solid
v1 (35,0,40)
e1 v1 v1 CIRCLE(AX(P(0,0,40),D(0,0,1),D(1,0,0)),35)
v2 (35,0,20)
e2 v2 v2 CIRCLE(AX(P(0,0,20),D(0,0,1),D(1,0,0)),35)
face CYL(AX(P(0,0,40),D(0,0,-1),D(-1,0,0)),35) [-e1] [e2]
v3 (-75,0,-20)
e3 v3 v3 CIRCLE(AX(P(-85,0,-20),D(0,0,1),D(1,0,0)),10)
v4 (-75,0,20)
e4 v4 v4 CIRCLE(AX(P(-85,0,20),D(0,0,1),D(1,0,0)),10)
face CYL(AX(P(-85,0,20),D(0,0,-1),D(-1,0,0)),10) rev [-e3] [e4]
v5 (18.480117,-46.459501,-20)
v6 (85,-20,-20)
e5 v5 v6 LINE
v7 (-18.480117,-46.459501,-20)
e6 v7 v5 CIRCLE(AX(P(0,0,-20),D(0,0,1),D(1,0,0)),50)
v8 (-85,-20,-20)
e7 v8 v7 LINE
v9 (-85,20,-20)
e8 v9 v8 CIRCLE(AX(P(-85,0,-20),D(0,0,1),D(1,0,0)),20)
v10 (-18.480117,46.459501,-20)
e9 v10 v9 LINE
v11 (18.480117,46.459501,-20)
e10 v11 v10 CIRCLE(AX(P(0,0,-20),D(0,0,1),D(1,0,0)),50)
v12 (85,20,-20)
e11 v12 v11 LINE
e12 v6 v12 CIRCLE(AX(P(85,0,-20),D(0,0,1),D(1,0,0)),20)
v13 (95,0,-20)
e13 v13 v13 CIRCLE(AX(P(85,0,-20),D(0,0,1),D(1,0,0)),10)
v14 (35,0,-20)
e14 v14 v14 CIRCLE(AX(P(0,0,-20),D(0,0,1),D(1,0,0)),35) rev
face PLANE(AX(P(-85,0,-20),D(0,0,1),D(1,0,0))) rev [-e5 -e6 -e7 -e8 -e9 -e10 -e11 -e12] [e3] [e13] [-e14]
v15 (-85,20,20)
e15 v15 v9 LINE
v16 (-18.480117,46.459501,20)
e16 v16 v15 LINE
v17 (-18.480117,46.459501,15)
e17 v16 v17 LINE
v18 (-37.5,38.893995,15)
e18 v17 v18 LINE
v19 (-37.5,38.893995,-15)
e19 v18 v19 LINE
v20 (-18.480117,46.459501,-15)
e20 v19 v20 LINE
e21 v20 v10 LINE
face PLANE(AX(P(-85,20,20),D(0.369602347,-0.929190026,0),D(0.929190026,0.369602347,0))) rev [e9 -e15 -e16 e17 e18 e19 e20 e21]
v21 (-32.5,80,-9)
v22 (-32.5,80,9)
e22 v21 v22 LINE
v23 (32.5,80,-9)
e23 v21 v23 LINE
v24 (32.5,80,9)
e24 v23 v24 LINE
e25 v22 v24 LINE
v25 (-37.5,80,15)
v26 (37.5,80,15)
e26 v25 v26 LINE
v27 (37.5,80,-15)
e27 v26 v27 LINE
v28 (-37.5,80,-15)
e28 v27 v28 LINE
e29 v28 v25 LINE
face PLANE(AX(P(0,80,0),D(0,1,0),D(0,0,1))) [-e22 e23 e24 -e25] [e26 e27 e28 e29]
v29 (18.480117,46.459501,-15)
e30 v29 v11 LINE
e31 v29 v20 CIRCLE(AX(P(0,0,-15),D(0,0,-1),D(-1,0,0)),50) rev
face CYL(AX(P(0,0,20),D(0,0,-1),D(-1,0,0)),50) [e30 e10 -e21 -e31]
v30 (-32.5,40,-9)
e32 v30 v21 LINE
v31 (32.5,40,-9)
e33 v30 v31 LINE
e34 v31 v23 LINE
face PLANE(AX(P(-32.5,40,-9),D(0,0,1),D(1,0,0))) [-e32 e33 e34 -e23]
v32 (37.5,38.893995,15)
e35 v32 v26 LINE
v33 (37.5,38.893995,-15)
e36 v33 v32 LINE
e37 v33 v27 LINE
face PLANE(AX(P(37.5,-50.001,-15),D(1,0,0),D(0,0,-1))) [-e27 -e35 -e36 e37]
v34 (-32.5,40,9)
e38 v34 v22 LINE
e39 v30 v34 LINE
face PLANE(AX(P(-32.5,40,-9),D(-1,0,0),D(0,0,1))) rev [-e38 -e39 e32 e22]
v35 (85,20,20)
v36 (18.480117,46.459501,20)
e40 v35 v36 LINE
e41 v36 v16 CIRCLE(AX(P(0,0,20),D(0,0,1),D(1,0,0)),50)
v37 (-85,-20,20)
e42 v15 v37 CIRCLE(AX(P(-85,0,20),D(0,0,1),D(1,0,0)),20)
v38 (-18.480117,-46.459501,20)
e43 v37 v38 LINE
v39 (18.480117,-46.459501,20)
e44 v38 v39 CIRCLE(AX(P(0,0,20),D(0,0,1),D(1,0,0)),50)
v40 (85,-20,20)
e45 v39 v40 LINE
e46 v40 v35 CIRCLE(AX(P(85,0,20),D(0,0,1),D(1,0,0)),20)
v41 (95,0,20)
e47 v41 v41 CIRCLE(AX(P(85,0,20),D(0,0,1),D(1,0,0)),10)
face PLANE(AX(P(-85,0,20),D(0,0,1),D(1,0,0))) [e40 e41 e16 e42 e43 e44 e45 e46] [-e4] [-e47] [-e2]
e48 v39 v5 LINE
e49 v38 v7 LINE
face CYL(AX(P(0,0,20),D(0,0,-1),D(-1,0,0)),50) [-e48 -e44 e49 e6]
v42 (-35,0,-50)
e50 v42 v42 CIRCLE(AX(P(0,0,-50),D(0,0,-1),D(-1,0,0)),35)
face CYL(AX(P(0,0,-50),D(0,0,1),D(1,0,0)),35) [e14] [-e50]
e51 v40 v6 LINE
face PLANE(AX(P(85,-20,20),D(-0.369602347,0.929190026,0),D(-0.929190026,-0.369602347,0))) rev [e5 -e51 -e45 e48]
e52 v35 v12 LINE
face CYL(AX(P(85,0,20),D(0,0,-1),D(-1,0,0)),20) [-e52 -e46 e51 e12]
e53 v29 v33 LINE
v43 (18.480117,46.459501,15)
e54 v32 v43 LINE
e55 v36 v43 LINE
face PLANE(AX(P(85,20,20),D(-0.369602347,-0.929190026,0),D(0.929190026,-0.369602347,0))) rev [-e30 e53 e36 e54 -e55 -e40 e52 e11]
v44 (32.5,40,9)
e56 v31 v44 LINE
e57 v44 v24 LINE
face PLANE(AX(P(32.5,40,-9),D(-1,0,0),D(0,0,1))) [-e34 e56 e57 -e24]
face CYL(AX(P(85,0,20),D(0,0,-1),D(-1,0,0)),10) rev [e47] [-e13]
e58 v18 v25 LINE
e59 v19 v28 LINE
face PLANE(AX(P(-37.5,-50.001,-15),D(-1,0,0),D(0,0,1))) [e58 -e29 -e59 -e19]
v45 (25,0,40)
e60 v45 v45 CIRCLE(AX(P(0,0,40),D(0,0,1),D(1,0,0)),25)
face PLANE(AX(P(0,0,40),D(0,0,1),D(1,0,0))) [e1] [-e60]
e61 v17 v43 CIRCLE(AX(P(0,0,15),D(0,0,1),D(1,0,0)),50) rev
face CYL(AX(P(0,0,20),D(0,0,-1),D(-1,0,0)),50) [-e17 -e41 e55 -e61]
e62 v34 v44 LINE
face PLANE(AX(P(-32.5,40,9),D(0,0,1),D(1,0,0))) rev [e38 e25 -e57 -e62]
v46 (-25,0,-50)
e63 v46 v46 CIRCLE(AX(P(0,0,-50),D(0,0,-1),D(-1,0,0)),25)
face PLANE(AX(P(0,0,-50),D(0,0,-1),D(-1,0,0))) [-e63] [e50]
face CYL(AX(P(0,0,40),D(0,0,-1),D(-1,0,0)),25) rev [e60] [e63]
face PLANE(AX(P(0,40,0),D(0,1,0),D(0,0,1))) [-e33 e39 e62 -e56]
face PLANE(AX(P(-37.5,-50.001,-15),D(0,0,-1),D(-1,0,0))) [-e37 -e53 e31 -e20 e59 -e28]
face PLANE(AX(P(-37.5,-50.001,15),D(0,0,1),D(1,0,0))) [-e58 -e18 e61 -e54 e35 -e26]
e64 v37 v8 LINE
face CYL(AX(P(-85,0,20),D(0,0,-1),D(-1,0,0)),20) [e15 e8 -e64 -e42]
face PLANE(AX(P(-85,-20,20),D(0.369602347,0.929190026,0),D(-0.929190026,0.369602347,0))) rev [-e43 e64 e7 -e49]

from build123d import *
from build123d.topology import SkipClean

# Parameters (mm, degrees)
SKETCH1_R                = 10
BOSS_EXTRUDE1_DEPTH      = 20
SKETCH2_R                = 35
SKETCH2_R_2              = 25
BOSS_EXTRUDE2_DEPTH      = 20
BOSS_EXTRUDE3_START      = 30
SKETCH3_R                = 35
SKETCH3_R_2              = 25
BOSS_EXTRUDE3_DEPTH      = 30
SKETCH4_R                = 25
CUT_EXTRUDE1_DEPTH       = 131.862523283
BOSS_EXTRUDE6_REACH      = 176.428
BOSS_EXTRUDE6_END_RADIUS = 50
SKETCH6_W                = 75
SKETCH6_H                = 30
SKETCH7_W                = 65
SKETCH7_H                = 18
CUT_EXTRUDE2_DEPTH       = 40


with BuildPart() as part:
    # Sketch1 → Boss-Extrude1 (new, symmetric)
    with BuildSketch(Plane.XY):
        with BuildLine():
            Line((-85, 20), (-18.480117336, 46.459501324))
            ThreePointArc((-18.480117336, 46.459501324), (0, 50), (18.480117336, 46.459501324))
            Line((18.480117336, 46.459501324), (85, 20))
            ThreePointArc((85, 20), (105, 0), (85, -20))
            Line((85, -20), (18.480117336, -46.459501324))
            ThreePointArc((18.480117336, -46.459501324), (0, -50), (-18.480117336, -46.459501324))
            Line((-18.480117336, -46.459501324), (-85, -20))
            ThreePointArc((-85, -20), (-105, 0), (-85, 20))
        make_face()
        with Locations((-85, 0)):
            Circle(SKETCH1_R, mode=Mode.SUBTRACT)
        with Locations((85, 0)):
            Circle(SKETCH1_R, mode=Mode.SUBTRACT)
    extrude(amount=BOSS_EXTRUDE1_DEPTH, both=True)

    # Sketch2 → Boss-Extrude2 (add)
    with BuildSketch(Plane.XY.offset(20)):
        Circle(SKETCH2_R)
        Circle(SKETCH2_R_2, mode=Mode.SUBTRACT)
    extrude(amount=BOSS_EXTRUDE2_DEPTH)

    # Sketch3 → Boss-Extrude3 (add)
    with BuildSketch(Plane(origin=(0, 0, -20), x_dir=(-1, 0, 0), z_dir=(0, 0, -1)).offset(BOSS_EXTRUDE3_START)):
        Circle(SKETCH3_R)
        Circle(SKETCH3_R_2, mode=Mode.SUBTRACT)
    extrude(amount=-BOSS_EXTRUDE3_DEPTH)

    # Sketch4 → Cut-Extrude1 (cut, through all)
    with BuildSketch(Plane(origin=(0, 0, -20), x_dir=(-1, 0, 0), z_dir=(0, 0, -1))):
        Circle(SKETCH4_R)
    extrude(amount=-CUT_EXTRUDE1_DEPTH, mode=Mode.SUBTRACT)

    # Boss-Extrude6: up to this cylinder (the profile starts outside it)
    with SkipClean():  # the faces are left unmerged after this step: merging them gives an invalid solid
        boss_extrude6_end = Plane(origin=(0, 0, 0), z_dir=(0, 0, -1)) * Cylinder(BOSS_EXTRUDE6_END_RADIUS, 453.856, mode=Mode.PRIVATE)
        # Sketch6 → Boss-Extrude6 (add, up to the surface)
        with BuildSketch(Plane(origin=(0, 80, 0), x_dir=(1, 0, 0), z_dir=(0, 1, 0)), mode=Mode.PRIVATE) as boss_extrude6_sk1:
            Rectangle(SKETCH6_W, SKETCH6_H)
        boss_extrude6_tool1 = extrude(boss_extrude6_sk1.sketch, amount=-BOSS_EXTRUDE6_REACH, mode=Mode.PRIVATE) - boss_extrude6_end
        add(boss_extrude6_tool1.solids().sort_by_distance((0, 80, 0))[0])
    add(part.part.scale(1), mode=Mode.REPLACE)  # the faces are merged on a copy

    # Sketch7 → Cut-Extrude2 (cut)
    with BuildSketch(Plane(origin=(0, 80, 0), x_dir=(1, 0, 0), z_dir=(0, 1, 0))):
        Rectangle(SKETCH7_W, SKETCH7_H)
    extrude(amount=-CUT_EXTRUDE2_DEPTH, mode=Mode.SUBTRACT)


solid = part.part
